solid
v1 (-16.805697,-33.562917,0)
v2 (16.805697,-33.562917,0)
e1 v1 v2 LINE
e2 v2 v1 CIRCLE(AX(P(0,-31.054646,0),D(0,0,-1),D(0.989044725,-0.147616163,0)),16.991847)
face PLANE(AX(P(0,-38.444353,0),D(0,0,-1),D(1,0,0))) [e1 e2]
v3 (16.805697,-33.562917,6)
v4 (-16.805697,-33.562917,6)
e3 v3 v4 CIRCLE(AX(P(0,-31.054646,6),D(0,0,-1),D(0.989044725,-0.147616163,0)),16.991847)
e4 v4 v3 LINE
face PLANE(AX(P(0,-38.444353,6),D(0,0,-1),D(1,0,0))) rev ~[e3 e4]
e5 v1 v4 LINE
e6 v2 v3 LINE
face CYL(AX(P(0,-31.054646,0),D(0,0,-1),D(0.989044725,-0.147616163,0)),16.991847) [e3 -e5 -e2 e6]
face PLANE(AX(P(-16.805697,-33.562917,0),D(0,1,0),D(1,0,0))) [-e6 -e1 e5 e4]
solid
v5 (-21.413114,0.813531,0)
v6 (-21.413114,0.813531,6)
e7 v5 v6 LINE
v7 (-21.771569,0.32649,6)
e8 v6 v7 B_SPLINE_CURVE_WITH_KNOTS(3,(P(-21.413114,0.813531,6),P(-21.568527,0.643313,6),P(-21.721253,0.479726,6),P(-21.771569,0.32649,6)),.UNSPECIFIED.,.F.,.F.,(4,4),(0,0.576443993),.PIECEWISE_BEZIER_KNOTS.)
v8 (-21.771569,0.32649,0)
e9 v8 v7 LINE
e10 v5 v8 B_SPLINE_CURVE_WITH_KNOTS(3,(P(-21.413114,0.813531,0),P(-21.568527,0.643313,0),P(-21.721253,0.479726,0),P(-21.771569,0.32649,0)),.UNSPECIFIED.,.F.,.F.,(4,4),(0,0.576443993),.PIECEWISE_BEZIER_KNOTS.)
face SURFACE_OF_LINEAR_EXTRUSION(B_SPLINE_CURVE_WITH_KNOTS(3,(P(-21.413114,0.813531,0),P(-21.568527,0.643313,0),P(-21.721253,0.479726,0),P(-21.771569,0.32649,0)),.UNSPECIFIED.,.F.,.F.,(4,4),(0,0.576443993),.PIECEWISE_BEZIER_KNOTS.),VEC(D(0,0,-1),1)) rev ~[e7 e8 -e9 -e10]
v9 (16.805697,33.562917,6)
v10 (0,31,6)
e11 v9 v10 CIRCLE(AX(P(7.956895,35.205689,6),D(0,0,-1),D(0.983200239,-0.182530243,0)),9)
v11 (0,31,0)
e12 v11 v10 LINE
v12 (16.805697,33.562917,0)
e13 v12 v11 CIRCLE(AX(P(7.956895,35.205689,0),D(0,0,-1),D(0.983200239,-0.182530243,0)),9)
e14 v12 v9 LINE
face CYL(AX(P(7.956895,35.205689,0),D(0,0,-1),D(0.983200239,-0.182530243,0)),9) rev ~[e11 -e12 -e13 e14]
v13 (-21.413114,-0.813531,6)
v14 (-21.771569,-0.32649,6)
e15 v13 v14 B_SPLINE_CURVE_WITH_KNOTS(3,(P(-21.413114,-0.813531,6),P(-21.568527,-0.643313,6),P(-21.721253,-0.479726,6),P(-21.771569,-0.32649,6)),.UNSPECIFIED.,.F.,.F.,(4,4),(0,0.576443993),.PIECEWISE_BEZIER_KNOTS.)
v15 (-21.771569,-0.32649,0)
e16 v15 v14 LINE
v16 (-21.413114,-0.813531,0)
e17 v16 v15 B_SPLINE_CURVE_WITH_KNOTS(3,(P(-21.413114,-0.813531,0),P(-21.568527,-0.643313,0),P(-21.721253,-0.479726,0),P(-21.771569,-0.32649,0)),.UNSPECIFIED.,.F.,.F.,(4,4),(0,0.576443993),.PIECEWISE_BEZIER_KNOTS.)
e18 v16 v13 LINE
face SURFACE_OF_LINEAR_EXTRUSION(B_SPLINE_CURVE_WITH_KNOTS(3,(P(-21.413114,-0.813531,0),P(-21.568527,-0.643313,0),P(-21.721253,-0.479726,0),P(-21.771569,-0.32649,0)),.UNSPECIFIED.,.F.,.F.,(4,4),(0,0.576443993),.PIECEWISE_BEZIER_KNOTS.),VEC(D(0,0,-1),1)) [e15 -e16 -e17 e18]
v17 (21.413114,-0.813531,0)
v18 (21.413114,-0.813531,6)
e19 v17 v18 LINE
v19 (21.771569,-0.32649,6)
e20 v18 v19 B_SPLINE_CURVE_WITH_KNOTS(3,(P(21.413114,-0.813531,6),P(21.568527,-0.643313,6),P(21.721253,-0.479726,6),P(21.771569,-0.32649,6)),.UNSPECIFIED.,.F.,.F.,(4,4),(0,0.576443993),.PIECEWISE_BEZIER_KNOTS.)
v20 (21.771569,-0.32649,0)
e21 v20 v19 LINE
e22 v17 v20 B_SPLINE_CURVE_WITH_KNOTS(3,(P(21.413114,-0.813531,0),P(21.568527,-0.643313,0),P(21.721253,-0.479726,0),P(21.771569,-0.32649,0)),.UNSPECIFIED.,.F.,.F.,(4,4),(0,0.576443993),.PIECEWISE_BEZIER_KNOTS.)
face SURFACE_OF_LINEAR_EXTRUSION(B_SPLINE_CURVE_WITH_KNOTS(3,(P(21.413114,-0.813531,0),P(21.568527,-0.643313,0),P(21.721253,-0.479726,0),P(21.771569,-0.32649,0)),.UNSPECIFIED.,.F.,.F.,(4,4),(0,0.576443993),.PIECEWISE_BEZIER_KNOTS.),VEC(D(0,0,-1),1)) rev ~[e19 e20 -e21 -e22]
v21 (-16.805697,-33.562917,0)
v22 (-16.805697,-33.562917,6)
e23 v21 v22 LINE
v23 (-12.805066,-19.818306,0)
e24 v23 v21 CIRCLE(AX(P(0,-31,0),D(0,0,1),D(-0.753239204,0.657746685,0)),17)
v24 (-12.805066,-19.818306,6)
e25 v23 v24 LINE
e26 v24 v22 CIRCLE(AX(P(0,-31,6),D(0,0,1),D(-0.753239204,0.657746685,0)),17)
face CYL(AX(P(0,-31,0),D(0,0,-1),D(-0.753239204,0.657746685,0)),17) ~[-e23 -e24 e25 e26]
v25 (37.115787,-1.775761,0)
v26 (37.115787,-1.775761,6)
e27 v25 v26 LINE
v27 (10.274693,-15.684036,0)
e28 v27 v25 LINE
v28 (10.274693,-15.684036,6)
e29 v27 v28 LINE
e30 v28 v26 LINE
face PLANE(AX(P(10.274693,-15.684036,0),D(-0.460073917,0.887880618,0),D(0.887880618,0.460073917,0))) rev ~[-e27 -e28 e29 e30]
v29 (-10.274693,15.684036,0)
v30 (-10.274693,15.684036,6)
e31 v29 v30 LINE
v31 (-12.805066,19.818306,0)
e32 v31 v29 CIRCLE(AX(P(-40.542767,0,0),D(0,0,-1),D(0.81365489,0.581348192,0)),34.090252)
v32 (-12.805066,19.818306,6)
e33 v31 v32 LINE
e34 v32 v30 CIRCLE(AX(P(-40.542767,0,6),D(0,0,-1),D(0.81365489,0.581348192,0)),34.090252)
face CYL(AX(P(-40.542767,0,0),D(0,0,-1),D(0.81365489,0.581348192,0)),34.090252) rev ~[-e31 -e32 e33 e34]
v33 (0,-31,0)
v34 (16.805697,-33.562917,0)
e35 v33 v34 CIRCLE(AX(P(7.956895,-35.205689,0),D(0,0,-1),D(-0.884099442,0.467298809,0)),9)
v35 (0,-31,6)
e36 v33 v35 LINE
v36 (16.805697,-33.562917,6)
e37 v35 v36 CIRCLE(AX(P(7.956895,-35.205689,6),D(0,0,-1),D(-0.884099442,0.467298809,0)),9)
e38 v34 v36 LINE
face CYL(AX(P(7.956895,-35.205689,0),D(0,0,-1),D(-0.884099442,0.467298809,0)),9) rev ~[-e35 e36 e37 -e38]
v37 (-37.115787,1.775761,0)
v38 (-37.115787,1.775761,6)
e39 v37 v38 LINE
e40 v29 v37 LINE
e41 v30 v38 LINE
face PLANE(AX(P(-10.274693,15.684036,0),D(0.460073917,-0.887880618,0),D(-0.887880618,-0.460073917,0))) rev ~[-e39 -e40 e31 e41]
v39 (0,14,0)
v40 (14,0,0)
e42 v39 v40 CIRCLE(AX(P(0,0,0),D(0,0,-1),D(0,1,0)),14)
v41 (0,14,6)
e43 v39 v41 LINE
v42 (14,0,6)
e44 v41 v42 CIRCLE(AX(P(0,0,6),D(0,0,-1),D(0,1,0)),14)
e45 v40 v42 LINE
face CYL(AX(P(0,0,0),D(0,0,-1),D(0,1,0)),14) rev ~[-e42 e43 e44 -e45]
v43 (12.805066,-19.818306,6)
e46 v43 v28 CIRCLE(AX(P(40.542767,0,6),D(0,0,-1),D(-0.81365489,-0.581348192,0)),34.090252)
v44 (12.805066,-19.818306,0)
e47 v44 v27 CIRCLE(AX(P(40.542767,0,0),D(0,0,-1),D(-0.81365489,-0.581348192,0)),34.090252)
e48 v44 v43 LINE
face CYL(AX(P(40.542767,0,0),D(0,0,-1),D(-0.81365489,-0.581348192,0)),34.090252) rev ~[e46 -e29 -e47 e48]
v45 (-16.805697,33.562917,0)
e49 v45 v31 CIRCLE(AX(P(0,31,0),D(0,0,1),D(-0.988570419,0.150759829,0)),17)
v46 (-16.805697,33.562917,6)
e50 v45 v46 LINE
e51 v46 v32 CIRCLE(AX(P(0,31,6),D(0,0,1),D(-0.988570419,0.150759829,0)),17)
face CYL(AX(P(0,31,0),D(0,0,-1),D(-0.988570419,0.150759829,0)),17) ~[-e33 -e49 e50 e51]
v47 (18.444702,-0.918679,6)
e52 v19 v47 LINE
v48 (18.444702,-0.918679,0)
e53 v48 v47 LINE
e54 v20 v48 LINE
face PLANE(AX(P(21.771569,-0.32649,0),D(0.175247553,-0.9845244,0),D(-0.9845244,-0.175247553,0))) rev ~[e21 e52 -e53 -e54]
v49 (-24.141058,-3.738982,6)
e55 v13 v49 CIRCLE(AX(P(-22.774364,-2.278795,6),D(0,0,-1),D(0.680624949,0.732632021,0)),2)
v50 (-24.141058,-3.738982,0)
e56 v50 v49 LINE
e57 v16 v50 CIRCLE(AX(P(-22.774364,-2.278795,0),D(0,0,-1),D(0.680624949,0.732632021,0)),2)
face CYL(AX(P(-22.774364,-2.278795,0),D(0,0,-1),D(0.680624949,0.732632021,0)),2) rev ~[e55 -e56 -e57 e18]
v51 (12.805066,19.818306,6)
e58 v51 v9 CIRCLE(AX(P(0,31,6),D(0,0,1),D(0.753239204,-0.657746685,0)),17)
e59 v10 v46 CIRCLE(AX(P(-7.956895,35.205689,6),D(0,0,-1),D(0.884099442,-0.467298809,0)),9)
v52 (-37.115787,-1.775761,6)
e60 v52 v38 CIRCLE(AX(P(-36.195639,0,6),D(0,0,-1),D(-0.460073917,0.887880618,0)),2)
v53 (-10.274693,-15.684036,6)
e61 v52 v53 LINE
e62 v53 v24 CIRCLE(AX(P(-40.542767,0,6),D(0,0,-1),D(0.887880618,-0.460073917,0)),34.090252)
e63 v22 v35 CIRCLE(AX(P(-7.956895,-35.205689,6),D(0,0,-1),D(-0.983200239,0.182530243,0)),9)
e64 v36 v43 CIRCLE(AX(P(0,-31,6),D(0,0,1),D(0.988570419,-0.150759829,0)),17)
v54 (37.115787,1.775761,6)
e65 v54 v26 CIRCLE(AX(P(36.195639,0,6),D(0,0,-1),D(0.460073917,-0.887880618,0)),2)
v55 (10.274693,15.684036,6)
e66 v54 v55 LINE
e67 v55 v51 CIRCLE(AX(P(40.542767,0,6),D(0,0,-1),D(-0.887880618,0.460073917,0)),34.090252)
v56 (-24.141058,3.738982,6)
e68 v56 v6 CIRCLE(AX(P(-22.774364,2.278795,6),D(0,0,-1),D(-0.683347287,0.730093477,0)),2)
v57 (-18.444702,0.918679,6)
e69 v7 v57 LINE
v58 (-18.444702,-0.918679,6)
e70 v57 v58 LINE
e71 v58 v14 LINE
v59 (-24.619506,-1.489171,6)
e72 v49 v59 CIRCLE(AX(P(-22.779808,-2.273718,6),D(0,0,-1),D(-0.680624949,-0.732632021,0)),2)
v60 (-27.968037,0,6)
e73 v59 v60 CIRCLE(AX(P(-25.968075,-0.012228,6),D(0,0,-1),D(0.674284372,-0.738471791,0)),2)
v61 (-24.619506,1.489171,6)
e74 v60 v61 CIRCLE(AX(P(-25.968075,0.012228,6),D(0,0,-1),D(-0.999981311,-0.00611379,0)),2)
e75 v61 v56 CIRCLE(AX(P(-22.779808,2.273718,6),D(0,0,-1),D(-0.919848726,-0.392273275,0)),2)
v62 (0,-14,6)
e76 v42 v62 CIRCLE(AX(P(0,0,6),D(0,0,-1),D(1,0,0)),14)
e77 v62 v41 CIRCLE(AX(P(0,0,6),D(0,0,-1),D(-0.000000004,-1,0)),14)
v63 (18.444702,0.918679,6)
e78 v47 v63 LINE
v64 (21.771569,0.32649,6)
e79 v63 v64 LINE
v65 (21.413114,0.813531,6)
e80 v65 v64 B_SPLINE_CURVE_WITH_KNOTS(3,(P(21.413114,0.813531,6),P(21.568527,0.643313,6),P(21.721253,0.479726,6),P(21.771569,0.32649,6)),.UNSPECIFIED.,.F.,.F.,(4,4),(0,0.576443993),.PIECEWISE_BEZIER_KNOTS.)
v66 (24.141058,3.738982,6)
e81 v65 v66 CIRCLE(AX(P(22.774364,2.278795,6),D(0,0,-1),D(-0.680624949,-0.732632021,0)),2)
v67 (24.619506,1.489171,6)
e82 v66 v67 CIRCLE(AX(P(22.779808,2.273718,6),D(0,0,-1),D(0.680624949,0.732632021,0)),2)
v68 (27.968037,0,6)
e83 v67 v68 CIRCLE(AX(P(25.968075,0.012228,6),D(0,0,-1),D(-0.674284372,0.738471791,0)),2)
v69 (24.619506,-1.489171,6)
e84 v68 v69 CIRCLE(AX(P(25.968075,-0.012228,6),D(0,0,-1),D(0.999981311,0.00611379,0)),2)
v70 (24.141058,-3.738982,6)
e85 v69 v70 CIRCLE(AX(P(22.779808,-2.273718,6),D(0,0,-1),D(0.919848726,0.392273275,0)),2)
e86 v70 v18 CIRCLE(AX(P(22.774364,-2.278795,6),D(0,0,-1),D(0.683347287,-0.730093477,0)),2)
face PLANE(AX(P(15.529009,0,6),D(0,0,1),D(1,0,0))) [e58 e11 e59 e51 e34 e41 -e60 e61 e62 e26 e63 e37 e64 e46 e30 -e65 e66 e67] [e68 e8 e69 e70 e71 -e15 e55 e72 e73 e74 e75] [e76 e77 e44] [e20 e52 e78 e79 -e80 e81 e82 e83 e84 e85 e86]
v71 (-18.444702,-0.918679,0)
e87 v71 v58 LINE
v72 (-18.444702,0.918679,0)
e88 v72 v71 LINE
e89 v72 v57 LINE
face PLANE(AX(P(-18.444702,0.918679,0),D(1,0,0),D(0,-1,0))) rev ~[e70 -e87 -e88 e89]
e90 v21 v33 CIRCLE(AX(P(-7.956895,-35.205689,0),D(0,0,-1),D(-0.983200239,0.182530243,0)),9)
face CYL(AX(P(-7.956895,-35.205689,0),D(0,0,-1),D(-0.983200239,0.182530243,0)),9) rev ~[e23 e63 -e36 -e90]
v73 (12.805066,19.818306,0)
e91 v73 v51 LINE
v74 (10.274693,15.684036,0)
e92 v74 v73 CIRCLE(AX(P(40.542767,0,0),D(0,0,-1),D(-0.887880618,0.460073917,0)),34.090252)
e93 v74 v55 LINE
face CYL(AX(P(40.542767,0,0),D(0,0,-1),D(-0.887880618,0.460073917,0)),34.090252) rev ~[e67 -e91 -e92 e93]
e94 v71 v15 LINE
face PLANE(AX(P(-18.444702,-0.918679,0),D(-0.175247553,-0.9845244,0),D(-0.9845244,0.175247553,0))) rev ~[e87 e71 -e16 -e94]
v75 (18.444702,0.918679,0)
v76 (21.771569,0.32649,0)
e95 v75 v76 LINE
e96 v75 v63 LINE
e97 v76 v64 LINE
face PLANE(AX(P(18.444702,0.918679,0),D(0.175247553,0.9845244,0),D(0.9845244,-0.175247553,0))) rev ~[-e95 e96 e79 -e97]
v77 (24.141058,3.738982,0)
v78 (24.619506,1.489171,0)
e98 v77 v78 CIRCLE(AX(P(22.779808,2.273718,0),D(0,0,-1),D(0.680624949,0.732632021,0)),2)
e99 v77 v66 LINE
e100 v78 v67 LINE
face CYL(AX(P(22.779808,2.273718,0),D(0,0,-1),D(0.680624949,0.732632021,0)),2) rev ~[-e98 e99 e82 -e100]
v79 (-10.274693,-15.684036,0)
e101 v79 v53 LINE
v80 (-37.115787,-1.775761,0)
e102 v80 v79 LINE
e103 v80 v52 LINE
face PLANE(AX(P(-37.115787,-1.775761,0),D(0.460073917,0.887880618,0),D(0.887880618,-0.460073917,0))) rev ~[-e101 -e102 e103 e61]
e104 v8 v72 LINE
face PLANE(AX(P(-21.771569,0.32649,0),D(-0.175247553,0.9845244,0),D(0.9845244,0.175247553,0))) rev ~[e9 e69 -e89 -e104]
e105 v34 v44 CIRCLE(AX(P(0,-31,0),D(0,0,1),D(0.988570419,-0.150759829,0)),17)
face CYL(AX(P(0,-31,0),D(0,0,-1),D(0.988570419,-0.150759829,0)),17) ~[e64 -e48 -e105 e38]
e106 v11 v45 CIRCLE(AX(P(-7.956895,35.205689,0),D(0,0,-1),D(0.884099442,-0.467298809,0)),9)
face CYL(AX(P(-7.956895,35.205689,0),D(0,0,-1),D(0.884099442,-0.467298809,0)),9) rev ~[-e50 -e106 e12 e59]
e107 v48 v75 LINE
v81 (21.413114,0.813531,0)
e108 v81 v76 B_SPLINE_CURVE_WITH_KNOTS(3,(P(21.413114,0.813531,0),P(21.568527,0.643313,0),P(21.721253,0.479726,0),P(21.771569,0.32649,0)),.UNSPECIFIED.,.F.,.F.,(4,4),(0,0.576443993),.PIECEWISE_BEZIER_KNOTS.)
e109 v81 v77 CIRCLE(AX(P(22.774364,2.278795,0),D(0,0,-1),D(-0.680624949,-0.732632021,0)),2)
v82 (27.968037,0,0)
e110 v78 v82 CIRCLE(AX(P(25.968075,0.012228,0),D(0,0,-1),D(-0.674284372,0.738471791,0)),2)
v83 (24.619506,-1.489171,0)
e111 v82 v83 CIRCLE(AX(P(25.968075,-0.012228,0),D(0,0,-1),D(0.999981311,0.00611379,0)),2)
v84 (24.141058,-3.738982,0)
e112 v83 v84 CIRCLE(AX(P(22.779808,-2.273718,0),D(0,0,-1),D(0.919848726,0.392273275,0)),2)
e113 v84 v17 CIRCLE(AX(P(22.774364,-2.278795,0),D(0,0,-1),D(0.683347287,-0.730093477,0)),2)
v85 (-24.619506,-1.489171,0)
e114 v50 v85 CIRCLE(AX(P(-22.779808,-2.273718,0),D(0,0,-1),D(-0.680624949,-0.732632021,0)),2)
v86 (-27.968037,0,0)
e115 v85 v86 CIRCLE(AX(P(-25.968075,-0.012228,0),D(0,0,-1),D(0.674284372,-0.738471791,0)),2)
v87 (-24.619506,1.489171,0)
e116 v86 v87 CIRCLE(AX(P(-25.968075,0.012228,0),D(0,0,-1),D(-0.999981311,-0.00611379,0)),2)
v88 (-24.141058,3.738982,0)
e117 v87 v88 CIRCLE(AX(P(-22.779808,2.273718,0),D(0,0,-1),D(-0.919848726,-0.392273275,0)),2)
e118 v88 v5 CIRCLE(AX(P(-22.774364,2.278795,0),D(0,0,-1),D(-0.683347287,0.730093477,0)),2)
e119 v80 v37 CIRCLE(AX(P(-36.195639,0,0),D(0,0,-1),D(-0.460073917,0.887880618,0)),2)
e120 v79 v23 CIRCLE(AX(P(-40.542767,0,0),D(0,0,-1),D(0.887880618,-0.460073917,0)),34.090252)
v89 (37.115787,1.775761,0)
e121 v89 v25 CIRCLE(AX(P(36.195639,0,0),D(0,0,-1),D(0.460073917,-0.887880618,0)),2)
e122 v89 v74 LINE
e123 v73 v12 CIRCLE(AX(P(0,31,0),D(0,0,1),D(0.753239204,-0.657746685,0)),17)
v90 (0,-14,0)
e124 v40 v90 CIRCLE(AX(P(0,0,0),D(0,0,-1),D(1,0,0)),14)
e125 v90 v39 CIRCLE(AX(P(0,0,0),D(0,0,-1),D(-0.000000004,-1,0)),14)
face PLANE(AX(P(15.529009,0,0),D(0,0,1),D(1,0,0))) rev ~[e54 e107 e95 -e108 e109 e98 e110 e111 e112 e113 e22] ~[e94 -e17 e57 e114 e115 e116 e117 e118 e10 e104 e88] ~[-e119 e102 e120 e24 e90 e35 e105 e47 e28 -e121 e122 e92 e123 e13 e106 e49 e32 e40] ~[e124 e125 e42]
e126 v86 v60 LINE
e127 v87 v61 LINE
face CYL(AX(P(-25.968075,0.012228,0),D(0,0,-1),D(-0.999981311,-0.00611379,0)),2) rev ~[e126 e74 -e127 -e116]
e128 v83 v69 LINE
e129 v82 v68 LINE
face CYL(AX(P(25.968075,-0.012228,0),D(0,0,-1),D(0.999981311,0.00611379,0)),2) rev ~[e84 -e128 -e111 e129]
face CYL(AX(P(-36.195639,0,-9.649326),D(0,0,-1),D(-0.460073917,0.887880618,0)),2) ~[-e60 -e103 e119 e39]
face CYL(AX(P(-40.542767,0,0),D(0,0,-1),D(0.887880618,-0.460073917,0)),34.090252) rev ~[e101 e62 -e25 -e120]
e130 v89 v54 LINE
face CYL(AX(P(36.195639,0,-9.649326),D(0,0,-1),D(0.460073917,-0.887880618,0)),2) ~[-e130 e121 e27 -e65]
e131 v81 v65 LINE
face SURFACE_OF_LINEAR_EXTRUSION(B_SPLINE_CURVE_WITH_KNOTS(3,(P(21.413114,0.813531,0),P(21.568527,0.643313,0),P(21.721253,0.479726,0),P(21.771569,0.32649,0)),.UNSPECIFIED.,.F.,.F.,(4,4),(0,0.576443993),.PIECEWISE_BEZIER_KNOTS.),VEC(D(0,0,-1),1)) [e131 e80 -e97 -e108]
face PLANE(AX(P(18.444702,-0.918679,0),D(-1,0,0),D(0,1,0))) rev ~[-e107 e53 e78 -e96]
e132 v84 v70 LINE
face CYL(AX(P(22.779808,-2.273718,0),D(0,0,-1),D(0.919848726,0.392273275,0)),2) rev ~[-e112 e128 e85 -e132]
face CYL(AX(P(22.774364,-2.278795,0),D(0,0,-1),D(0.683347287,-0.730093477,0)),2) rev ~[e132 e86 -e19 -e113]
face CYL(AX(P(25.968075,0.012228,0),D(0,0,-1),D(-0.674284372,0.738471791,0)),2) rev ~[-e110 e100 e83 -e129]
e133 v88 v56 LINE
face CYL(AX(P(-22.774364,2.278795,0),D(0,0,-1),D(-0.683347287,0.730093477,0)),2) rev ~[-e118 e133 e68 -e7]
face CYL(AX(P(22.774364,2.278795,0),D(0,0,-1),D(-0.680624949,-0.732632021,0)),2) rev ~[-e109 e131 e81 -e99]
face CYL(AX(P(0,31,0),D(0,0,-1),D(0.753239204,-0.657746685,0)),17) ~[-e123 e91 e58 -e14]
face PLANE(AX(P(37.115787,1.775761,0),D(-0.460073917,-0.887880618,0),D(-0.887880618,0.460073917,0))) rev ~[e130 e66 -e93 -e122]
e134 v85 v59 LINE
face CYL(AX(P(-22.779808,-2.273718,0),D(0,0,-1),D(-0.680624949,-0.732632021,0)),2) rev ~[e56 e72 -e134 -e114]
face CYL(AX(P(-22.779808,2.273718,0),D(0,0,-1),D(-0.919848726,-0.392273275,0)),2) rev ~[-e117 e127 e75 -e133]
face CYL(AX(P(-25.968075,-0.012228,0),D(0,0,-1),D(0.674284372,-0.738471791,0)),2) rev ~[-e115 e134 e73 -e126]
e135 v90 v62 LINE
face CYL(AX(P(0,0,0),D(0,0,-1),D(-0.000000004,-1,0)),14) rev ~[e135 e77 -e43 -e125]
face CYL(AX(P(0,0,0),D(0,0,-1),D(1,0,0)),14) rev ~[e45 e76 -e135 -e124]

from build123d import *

# Parameters (mm, degrees)
F1_DEPTH    = 6
F2_T1_DEPTH = 25.2986514743
F4_DEPTH    = 6


# Not quite as in the source:
# - a fillet or chamfer that OpenCascade refuses, or shapes differently, is made with other operations: its cross-section is extruded or revolved along the edge and cut away or added


with BuildPart() as f1:
    # F0 (on Top) → F1 (new body)
    with BuildSketch(Plane.XY):
        with BuildLine():
            ThreePointArc((-5.8e-09, 14), (9.8994949346, 9.8994949386), (14, 0))
            ThreePointArc((14, 0), (9.8994949148, -9.8994949584), (-6.17e-08, -14))
            ThreePointArc((-6.17e-08, -14), (7.0324678211, -15.5227781451), (12.8050664705, -19.8183063588))
            ThreePointArc((12.8050664705, -19.8183063588), (11.4663069969, -17.796201056), (10.2746927153, -15.6840357719))
            Line((10.2746927153, -15.6840357719), (37.1157870048, -1.775761235))
            ThreePointArc((37.1157870048, -1.775761235), (38.195639171, 0), (37.1157870048, 1.775761235))
            Line((37.1157870048, 1.775761235), (10.2746927153, 15.6840357719))
            ThreePointArc((10.2746927153, 15.6840357719), (11.4663069969, 17.796201056), (12.8050664705, 19.8183063588))
            ThreePointArc((12.8050664705, 19.8183063588), (7.0324678466, 15.5227781567), (-5.8e-09, 14))
        make_face()
        with BuildLine():
            ThreePointArc((24.141058394, -3.738981755), (21.3116357879, -3.6427693993), (21.4131139219, -0.813530758))
            add(Edge.make_bspline(
                [(21.4131139219, -0.813530758), (21.5685270189, -0.6433130102), (21.7212531535, -0.4797257131), (21.771568805, -0.3264895931)],
                knots=[0, 0, 0, 0, 0.5764439926, 0.5764439926, 0.5764439926, 0.5764439926], degree=3))
            Line((21.771568805, -0.3264895931), (18.4447020292, -0.9186793468))
            Line((18.4447020292, -0.9186793468), (18.4447020292, 0.9186793468))
            Line((18.4447020292, 0.9186793468), (21.771568805, 0.3264895931))
            add(Edge.make_bspline(
                [(21.4131139219, 0.813530758), (21.5685270189, 0.6433130102), (21.7212531535, 0.4797257131), (21.771568805, 0.3264895931)],
                knots=[0, 0, 0, 0, 0.5764439926, 0.5764439926, 0.5764439926, 0.5764439926], degree=3))
            ThreePointArc((21.4131139219, 0.813530758), (21.3116357879, 3.6427693993), (24.141058394, 3.738981755))
            ThreePointArc((24.141058394, 3.738981755), (24.736062035, 2.6897370524), (24.6195059471, 1.4891711621))
            ThreePointArc((24.6195059471, 1.4891711621), (26.7807777011, 1.8396612496), (27.9680373117, 0))
            ThreePointArc((27.9680373117, 0), (26.7807777011, -1.8396612496), (24.6195059471, -1.4891711621))
            ThreePointArc((24.6195059471, -1.4891711621), (24.736062035, -2.6897370524), (24.141058394, -3.738981755))
        make_face(mode=Mode.SUBTRACT)
        with BuildLine():
            ThreePointArc((-6.17e-08, -14), (-14, 2.8e-08), (-5.8e-09, 14))
            ThreePointArc((-5.8e-09, 14), (-7.0324678518, 15.5227781591), (-12.8050664705, 19.8183063588))
            ThreePointArc((-12.8050664705, 19.8183063588), (-11.4663069969, 17.796201056), (-10.2746927153, 15.6840357719))
            Line((-10.2746927153, 15.6840357719), (-37.1157870048, 1.775761235))
            ThreePointArc((-37.1157870048, 1.775761235), (-38.195639171, 0), (-37.1157870048, -1.775761235))
            Line((-37.1157870048, -1.775761235), (-10.2746927153, -15.6840357719))
            ThreePointArc((-10.2746927153, -15.6840357719), (-11.4663069969, -17.796201056), (-12.8050664705, -19.8183063588))
            ThreePointArc((-12.8050664705, -19.8183063588), (-7.0324678773, -15.5227781707), (-6.17e-08, -14))
        make_face()
        with BuildLine():
            ThreePointArc((-24.6195059471, -1.4891711621), (-26.7807777011, -1.8396612496), (-27.9680373117, 0))
            ThreePointArc((-27.9680373117, 0), (-26.7807777011, 1.8396612496), (-24.6195059471, 1.4891711621))
            ThreePointArc((-24.6195059471, 1.4891711621), (-24.736062035, 2.6897370524), (-24.141058394, 3.738981755))
            ThreePointArc((-24.141058394, 3.738981755), (-21.3116357879, 3.6427693993), (-21.4131139219, 0.813530758))
            add(Edge.make_bspline(
                [(-21.4131139219, 0.813530758), (-21.5685270189, 0.6433130102), (-21.7212531535, 0.4797257131), (-21.771568805, 0.3264895931)],
                knots=[0, 0, 0, 0, 0.5764439926, 0.5764439926, 0.5764439926, 0.5764439926], degree=3))
            Line((-21.771568805, 0.3264895931), (-18.4447020292, 0.9186793468))
            Line((-18.4447020292, 0.9186793468), (-18.4447020292, -0.9186793468))
            Line((-18.4447020292, -0.9186793468), (-21.771568805, -0.3264895931))
            add(Edge.make_bspline(
                [(-21.4131139219, -0.813530758), (-21.5685270189, -0.6433130102), (-21.7212531535, -0.4797257131), (-21.771568805, -0.3264895931)],
                knots=[0, 0, 0, 0, 0.5764439926, 0.5764439926, 0.5764439926, 0.5764439926], degree=3))
            ThreePointArc((-21.4131139219, -0.813530758), (-21.3116357879, -3.6427693993), (-24.141058394, -3.738981755))
            ThreePointArc((-24.141058394, -3.738981755), (-24.736062035, -2.6897370524), (-24.6195059471, -1.4891711621))
        make_face(mode=Mode.SUBTRACT)
        with BuildLine():
            ThreePointArc((-12.8050664705, 19.8183063588), (-7.0324678518, 15.5227781591), (-5.8e-09, 14))
            ThreePointArc((-5.8e-09, 14), (7.0324678466, 15.5227781567), (12.8050664705, 19.8183063588))
            ThreePointArc((12.8050664705, 19.8183063588), (16.3226196216, 26.2489907715), (16.8056971277, 33.5629170979))
            ThreePointArc((16.8056971277, 33.5629170979), (9.3137334384, 26.3085555113), (0, 31))
            ThreePointArc((0, 31), (-9.3137334384, 26.3085555113), (-16.8056971277, 33.5629170979))
            ThreePointArc((-16.8056971277, 33.5629170979), (-16.3226196216, 26.2489907715), (-12.8050664705, 19.8183063588))
        make_face()
        with BuildLine():
            ThreePointArc((12.8050664705, -19.8183063588), (7.0324678211, -15.5227781451), (-6.17e-08, -14))
            ThreePointArc((-6.17e-08, -14), (-7.0324678773, -15.5227781707), (-12.8050664705, -19.8183063588))
            ThreePointArc((-12.8050664705, -19.8183063588), (-16.3226196216, -26.2489907715), (-16.8056971277, -33.5629170979))
            ThreePointArc((-16.8056971277, -33.5629170979), (-9.3137334384, -26.3085555113), (0, -31))
            ThreePointArc((0, -31), (9.3137334384, -26.3085555113), (16.8056971277, -33.5629170979))
            ThreePointArc((16.8056971277, -33.5629170979), (16.3226196216, -26.2489907715), (12.8050664705, -19.8183063588))
        make_face()
        with BuildLine():
            ThreePointArc((-37.1157870048, -1.775761235), (-38.195639171, 0), (-37.1157870048, 1.775761235))
            Line((-37.1157870048, 1.775761235), (-40.5427667225, 0))
            Line((-40.5427667225, 0), (-37.1157870048, -1.775761235))
        make_face()
        with BuildLine():
            Line((40.5427667225, 0), (37.1157870048, 1.775761235))
            ThreePointArc((37.1157870048, 1.775761235), (38.195639171, 0), (37.1157870048, -1.775761235))
            Line((37.1157870048, -1.775761235), (40.5427667225, 0))
        make_face()
    extrude(amount=F1_DEPTH)

    # F2: fillet of radius 2 on 2 edges, made by hand

    # F2_s2 → F2_t1 (cut)
    with BuildSketch(Plane.XY.offset(-9.6493257372)):
        with BuildLine():
            ThreePointArc((-37.1157870048, 1.775761235), (-38.195639171, 0), (-37.1157870048, -1.775761235))
            Line((-37.1157870048, -1.775761235), (-40.5427667225, 0))
            Line((-40.5427667225, 0), (-37.1157870048, 1.775761235))
        make_face()
        with BuildLine():
            ThreePointArc((37.1157870048, -1.775761235), (38.195639171, 0), (37.1157870048, 1.775761235))
            Line((37.1157870048, 1.775761235), (40.5427667225, 0))
            Line((40.5427667225, 0), (37.1157870048, -1.775761235))
        make_face()
    extrude(amount=F2_T1_DEPTH, mode=Mode.SUBTRACT)


with BuildPart() as f4:
    # F3 (on face) → F4 (new body)
    with BuildSketch(Plane(origin=(0, 0, 0), x_dir=(1, 0, 0), z_dir=(0, 0, -1))):
        with BuildLine():
            ThreePointArc((16.8056971277, 33.5629170979), (0, 48.046493252), (-16.8056971277, 33.5629170979))
            Line((-16.8056971277, 33.5629170979), (16.8056971277, 33.5629170979))
        make_face()
    extrude(amount=-F4_DEPTH)


solid = Compound([f1.part, f4.part])
